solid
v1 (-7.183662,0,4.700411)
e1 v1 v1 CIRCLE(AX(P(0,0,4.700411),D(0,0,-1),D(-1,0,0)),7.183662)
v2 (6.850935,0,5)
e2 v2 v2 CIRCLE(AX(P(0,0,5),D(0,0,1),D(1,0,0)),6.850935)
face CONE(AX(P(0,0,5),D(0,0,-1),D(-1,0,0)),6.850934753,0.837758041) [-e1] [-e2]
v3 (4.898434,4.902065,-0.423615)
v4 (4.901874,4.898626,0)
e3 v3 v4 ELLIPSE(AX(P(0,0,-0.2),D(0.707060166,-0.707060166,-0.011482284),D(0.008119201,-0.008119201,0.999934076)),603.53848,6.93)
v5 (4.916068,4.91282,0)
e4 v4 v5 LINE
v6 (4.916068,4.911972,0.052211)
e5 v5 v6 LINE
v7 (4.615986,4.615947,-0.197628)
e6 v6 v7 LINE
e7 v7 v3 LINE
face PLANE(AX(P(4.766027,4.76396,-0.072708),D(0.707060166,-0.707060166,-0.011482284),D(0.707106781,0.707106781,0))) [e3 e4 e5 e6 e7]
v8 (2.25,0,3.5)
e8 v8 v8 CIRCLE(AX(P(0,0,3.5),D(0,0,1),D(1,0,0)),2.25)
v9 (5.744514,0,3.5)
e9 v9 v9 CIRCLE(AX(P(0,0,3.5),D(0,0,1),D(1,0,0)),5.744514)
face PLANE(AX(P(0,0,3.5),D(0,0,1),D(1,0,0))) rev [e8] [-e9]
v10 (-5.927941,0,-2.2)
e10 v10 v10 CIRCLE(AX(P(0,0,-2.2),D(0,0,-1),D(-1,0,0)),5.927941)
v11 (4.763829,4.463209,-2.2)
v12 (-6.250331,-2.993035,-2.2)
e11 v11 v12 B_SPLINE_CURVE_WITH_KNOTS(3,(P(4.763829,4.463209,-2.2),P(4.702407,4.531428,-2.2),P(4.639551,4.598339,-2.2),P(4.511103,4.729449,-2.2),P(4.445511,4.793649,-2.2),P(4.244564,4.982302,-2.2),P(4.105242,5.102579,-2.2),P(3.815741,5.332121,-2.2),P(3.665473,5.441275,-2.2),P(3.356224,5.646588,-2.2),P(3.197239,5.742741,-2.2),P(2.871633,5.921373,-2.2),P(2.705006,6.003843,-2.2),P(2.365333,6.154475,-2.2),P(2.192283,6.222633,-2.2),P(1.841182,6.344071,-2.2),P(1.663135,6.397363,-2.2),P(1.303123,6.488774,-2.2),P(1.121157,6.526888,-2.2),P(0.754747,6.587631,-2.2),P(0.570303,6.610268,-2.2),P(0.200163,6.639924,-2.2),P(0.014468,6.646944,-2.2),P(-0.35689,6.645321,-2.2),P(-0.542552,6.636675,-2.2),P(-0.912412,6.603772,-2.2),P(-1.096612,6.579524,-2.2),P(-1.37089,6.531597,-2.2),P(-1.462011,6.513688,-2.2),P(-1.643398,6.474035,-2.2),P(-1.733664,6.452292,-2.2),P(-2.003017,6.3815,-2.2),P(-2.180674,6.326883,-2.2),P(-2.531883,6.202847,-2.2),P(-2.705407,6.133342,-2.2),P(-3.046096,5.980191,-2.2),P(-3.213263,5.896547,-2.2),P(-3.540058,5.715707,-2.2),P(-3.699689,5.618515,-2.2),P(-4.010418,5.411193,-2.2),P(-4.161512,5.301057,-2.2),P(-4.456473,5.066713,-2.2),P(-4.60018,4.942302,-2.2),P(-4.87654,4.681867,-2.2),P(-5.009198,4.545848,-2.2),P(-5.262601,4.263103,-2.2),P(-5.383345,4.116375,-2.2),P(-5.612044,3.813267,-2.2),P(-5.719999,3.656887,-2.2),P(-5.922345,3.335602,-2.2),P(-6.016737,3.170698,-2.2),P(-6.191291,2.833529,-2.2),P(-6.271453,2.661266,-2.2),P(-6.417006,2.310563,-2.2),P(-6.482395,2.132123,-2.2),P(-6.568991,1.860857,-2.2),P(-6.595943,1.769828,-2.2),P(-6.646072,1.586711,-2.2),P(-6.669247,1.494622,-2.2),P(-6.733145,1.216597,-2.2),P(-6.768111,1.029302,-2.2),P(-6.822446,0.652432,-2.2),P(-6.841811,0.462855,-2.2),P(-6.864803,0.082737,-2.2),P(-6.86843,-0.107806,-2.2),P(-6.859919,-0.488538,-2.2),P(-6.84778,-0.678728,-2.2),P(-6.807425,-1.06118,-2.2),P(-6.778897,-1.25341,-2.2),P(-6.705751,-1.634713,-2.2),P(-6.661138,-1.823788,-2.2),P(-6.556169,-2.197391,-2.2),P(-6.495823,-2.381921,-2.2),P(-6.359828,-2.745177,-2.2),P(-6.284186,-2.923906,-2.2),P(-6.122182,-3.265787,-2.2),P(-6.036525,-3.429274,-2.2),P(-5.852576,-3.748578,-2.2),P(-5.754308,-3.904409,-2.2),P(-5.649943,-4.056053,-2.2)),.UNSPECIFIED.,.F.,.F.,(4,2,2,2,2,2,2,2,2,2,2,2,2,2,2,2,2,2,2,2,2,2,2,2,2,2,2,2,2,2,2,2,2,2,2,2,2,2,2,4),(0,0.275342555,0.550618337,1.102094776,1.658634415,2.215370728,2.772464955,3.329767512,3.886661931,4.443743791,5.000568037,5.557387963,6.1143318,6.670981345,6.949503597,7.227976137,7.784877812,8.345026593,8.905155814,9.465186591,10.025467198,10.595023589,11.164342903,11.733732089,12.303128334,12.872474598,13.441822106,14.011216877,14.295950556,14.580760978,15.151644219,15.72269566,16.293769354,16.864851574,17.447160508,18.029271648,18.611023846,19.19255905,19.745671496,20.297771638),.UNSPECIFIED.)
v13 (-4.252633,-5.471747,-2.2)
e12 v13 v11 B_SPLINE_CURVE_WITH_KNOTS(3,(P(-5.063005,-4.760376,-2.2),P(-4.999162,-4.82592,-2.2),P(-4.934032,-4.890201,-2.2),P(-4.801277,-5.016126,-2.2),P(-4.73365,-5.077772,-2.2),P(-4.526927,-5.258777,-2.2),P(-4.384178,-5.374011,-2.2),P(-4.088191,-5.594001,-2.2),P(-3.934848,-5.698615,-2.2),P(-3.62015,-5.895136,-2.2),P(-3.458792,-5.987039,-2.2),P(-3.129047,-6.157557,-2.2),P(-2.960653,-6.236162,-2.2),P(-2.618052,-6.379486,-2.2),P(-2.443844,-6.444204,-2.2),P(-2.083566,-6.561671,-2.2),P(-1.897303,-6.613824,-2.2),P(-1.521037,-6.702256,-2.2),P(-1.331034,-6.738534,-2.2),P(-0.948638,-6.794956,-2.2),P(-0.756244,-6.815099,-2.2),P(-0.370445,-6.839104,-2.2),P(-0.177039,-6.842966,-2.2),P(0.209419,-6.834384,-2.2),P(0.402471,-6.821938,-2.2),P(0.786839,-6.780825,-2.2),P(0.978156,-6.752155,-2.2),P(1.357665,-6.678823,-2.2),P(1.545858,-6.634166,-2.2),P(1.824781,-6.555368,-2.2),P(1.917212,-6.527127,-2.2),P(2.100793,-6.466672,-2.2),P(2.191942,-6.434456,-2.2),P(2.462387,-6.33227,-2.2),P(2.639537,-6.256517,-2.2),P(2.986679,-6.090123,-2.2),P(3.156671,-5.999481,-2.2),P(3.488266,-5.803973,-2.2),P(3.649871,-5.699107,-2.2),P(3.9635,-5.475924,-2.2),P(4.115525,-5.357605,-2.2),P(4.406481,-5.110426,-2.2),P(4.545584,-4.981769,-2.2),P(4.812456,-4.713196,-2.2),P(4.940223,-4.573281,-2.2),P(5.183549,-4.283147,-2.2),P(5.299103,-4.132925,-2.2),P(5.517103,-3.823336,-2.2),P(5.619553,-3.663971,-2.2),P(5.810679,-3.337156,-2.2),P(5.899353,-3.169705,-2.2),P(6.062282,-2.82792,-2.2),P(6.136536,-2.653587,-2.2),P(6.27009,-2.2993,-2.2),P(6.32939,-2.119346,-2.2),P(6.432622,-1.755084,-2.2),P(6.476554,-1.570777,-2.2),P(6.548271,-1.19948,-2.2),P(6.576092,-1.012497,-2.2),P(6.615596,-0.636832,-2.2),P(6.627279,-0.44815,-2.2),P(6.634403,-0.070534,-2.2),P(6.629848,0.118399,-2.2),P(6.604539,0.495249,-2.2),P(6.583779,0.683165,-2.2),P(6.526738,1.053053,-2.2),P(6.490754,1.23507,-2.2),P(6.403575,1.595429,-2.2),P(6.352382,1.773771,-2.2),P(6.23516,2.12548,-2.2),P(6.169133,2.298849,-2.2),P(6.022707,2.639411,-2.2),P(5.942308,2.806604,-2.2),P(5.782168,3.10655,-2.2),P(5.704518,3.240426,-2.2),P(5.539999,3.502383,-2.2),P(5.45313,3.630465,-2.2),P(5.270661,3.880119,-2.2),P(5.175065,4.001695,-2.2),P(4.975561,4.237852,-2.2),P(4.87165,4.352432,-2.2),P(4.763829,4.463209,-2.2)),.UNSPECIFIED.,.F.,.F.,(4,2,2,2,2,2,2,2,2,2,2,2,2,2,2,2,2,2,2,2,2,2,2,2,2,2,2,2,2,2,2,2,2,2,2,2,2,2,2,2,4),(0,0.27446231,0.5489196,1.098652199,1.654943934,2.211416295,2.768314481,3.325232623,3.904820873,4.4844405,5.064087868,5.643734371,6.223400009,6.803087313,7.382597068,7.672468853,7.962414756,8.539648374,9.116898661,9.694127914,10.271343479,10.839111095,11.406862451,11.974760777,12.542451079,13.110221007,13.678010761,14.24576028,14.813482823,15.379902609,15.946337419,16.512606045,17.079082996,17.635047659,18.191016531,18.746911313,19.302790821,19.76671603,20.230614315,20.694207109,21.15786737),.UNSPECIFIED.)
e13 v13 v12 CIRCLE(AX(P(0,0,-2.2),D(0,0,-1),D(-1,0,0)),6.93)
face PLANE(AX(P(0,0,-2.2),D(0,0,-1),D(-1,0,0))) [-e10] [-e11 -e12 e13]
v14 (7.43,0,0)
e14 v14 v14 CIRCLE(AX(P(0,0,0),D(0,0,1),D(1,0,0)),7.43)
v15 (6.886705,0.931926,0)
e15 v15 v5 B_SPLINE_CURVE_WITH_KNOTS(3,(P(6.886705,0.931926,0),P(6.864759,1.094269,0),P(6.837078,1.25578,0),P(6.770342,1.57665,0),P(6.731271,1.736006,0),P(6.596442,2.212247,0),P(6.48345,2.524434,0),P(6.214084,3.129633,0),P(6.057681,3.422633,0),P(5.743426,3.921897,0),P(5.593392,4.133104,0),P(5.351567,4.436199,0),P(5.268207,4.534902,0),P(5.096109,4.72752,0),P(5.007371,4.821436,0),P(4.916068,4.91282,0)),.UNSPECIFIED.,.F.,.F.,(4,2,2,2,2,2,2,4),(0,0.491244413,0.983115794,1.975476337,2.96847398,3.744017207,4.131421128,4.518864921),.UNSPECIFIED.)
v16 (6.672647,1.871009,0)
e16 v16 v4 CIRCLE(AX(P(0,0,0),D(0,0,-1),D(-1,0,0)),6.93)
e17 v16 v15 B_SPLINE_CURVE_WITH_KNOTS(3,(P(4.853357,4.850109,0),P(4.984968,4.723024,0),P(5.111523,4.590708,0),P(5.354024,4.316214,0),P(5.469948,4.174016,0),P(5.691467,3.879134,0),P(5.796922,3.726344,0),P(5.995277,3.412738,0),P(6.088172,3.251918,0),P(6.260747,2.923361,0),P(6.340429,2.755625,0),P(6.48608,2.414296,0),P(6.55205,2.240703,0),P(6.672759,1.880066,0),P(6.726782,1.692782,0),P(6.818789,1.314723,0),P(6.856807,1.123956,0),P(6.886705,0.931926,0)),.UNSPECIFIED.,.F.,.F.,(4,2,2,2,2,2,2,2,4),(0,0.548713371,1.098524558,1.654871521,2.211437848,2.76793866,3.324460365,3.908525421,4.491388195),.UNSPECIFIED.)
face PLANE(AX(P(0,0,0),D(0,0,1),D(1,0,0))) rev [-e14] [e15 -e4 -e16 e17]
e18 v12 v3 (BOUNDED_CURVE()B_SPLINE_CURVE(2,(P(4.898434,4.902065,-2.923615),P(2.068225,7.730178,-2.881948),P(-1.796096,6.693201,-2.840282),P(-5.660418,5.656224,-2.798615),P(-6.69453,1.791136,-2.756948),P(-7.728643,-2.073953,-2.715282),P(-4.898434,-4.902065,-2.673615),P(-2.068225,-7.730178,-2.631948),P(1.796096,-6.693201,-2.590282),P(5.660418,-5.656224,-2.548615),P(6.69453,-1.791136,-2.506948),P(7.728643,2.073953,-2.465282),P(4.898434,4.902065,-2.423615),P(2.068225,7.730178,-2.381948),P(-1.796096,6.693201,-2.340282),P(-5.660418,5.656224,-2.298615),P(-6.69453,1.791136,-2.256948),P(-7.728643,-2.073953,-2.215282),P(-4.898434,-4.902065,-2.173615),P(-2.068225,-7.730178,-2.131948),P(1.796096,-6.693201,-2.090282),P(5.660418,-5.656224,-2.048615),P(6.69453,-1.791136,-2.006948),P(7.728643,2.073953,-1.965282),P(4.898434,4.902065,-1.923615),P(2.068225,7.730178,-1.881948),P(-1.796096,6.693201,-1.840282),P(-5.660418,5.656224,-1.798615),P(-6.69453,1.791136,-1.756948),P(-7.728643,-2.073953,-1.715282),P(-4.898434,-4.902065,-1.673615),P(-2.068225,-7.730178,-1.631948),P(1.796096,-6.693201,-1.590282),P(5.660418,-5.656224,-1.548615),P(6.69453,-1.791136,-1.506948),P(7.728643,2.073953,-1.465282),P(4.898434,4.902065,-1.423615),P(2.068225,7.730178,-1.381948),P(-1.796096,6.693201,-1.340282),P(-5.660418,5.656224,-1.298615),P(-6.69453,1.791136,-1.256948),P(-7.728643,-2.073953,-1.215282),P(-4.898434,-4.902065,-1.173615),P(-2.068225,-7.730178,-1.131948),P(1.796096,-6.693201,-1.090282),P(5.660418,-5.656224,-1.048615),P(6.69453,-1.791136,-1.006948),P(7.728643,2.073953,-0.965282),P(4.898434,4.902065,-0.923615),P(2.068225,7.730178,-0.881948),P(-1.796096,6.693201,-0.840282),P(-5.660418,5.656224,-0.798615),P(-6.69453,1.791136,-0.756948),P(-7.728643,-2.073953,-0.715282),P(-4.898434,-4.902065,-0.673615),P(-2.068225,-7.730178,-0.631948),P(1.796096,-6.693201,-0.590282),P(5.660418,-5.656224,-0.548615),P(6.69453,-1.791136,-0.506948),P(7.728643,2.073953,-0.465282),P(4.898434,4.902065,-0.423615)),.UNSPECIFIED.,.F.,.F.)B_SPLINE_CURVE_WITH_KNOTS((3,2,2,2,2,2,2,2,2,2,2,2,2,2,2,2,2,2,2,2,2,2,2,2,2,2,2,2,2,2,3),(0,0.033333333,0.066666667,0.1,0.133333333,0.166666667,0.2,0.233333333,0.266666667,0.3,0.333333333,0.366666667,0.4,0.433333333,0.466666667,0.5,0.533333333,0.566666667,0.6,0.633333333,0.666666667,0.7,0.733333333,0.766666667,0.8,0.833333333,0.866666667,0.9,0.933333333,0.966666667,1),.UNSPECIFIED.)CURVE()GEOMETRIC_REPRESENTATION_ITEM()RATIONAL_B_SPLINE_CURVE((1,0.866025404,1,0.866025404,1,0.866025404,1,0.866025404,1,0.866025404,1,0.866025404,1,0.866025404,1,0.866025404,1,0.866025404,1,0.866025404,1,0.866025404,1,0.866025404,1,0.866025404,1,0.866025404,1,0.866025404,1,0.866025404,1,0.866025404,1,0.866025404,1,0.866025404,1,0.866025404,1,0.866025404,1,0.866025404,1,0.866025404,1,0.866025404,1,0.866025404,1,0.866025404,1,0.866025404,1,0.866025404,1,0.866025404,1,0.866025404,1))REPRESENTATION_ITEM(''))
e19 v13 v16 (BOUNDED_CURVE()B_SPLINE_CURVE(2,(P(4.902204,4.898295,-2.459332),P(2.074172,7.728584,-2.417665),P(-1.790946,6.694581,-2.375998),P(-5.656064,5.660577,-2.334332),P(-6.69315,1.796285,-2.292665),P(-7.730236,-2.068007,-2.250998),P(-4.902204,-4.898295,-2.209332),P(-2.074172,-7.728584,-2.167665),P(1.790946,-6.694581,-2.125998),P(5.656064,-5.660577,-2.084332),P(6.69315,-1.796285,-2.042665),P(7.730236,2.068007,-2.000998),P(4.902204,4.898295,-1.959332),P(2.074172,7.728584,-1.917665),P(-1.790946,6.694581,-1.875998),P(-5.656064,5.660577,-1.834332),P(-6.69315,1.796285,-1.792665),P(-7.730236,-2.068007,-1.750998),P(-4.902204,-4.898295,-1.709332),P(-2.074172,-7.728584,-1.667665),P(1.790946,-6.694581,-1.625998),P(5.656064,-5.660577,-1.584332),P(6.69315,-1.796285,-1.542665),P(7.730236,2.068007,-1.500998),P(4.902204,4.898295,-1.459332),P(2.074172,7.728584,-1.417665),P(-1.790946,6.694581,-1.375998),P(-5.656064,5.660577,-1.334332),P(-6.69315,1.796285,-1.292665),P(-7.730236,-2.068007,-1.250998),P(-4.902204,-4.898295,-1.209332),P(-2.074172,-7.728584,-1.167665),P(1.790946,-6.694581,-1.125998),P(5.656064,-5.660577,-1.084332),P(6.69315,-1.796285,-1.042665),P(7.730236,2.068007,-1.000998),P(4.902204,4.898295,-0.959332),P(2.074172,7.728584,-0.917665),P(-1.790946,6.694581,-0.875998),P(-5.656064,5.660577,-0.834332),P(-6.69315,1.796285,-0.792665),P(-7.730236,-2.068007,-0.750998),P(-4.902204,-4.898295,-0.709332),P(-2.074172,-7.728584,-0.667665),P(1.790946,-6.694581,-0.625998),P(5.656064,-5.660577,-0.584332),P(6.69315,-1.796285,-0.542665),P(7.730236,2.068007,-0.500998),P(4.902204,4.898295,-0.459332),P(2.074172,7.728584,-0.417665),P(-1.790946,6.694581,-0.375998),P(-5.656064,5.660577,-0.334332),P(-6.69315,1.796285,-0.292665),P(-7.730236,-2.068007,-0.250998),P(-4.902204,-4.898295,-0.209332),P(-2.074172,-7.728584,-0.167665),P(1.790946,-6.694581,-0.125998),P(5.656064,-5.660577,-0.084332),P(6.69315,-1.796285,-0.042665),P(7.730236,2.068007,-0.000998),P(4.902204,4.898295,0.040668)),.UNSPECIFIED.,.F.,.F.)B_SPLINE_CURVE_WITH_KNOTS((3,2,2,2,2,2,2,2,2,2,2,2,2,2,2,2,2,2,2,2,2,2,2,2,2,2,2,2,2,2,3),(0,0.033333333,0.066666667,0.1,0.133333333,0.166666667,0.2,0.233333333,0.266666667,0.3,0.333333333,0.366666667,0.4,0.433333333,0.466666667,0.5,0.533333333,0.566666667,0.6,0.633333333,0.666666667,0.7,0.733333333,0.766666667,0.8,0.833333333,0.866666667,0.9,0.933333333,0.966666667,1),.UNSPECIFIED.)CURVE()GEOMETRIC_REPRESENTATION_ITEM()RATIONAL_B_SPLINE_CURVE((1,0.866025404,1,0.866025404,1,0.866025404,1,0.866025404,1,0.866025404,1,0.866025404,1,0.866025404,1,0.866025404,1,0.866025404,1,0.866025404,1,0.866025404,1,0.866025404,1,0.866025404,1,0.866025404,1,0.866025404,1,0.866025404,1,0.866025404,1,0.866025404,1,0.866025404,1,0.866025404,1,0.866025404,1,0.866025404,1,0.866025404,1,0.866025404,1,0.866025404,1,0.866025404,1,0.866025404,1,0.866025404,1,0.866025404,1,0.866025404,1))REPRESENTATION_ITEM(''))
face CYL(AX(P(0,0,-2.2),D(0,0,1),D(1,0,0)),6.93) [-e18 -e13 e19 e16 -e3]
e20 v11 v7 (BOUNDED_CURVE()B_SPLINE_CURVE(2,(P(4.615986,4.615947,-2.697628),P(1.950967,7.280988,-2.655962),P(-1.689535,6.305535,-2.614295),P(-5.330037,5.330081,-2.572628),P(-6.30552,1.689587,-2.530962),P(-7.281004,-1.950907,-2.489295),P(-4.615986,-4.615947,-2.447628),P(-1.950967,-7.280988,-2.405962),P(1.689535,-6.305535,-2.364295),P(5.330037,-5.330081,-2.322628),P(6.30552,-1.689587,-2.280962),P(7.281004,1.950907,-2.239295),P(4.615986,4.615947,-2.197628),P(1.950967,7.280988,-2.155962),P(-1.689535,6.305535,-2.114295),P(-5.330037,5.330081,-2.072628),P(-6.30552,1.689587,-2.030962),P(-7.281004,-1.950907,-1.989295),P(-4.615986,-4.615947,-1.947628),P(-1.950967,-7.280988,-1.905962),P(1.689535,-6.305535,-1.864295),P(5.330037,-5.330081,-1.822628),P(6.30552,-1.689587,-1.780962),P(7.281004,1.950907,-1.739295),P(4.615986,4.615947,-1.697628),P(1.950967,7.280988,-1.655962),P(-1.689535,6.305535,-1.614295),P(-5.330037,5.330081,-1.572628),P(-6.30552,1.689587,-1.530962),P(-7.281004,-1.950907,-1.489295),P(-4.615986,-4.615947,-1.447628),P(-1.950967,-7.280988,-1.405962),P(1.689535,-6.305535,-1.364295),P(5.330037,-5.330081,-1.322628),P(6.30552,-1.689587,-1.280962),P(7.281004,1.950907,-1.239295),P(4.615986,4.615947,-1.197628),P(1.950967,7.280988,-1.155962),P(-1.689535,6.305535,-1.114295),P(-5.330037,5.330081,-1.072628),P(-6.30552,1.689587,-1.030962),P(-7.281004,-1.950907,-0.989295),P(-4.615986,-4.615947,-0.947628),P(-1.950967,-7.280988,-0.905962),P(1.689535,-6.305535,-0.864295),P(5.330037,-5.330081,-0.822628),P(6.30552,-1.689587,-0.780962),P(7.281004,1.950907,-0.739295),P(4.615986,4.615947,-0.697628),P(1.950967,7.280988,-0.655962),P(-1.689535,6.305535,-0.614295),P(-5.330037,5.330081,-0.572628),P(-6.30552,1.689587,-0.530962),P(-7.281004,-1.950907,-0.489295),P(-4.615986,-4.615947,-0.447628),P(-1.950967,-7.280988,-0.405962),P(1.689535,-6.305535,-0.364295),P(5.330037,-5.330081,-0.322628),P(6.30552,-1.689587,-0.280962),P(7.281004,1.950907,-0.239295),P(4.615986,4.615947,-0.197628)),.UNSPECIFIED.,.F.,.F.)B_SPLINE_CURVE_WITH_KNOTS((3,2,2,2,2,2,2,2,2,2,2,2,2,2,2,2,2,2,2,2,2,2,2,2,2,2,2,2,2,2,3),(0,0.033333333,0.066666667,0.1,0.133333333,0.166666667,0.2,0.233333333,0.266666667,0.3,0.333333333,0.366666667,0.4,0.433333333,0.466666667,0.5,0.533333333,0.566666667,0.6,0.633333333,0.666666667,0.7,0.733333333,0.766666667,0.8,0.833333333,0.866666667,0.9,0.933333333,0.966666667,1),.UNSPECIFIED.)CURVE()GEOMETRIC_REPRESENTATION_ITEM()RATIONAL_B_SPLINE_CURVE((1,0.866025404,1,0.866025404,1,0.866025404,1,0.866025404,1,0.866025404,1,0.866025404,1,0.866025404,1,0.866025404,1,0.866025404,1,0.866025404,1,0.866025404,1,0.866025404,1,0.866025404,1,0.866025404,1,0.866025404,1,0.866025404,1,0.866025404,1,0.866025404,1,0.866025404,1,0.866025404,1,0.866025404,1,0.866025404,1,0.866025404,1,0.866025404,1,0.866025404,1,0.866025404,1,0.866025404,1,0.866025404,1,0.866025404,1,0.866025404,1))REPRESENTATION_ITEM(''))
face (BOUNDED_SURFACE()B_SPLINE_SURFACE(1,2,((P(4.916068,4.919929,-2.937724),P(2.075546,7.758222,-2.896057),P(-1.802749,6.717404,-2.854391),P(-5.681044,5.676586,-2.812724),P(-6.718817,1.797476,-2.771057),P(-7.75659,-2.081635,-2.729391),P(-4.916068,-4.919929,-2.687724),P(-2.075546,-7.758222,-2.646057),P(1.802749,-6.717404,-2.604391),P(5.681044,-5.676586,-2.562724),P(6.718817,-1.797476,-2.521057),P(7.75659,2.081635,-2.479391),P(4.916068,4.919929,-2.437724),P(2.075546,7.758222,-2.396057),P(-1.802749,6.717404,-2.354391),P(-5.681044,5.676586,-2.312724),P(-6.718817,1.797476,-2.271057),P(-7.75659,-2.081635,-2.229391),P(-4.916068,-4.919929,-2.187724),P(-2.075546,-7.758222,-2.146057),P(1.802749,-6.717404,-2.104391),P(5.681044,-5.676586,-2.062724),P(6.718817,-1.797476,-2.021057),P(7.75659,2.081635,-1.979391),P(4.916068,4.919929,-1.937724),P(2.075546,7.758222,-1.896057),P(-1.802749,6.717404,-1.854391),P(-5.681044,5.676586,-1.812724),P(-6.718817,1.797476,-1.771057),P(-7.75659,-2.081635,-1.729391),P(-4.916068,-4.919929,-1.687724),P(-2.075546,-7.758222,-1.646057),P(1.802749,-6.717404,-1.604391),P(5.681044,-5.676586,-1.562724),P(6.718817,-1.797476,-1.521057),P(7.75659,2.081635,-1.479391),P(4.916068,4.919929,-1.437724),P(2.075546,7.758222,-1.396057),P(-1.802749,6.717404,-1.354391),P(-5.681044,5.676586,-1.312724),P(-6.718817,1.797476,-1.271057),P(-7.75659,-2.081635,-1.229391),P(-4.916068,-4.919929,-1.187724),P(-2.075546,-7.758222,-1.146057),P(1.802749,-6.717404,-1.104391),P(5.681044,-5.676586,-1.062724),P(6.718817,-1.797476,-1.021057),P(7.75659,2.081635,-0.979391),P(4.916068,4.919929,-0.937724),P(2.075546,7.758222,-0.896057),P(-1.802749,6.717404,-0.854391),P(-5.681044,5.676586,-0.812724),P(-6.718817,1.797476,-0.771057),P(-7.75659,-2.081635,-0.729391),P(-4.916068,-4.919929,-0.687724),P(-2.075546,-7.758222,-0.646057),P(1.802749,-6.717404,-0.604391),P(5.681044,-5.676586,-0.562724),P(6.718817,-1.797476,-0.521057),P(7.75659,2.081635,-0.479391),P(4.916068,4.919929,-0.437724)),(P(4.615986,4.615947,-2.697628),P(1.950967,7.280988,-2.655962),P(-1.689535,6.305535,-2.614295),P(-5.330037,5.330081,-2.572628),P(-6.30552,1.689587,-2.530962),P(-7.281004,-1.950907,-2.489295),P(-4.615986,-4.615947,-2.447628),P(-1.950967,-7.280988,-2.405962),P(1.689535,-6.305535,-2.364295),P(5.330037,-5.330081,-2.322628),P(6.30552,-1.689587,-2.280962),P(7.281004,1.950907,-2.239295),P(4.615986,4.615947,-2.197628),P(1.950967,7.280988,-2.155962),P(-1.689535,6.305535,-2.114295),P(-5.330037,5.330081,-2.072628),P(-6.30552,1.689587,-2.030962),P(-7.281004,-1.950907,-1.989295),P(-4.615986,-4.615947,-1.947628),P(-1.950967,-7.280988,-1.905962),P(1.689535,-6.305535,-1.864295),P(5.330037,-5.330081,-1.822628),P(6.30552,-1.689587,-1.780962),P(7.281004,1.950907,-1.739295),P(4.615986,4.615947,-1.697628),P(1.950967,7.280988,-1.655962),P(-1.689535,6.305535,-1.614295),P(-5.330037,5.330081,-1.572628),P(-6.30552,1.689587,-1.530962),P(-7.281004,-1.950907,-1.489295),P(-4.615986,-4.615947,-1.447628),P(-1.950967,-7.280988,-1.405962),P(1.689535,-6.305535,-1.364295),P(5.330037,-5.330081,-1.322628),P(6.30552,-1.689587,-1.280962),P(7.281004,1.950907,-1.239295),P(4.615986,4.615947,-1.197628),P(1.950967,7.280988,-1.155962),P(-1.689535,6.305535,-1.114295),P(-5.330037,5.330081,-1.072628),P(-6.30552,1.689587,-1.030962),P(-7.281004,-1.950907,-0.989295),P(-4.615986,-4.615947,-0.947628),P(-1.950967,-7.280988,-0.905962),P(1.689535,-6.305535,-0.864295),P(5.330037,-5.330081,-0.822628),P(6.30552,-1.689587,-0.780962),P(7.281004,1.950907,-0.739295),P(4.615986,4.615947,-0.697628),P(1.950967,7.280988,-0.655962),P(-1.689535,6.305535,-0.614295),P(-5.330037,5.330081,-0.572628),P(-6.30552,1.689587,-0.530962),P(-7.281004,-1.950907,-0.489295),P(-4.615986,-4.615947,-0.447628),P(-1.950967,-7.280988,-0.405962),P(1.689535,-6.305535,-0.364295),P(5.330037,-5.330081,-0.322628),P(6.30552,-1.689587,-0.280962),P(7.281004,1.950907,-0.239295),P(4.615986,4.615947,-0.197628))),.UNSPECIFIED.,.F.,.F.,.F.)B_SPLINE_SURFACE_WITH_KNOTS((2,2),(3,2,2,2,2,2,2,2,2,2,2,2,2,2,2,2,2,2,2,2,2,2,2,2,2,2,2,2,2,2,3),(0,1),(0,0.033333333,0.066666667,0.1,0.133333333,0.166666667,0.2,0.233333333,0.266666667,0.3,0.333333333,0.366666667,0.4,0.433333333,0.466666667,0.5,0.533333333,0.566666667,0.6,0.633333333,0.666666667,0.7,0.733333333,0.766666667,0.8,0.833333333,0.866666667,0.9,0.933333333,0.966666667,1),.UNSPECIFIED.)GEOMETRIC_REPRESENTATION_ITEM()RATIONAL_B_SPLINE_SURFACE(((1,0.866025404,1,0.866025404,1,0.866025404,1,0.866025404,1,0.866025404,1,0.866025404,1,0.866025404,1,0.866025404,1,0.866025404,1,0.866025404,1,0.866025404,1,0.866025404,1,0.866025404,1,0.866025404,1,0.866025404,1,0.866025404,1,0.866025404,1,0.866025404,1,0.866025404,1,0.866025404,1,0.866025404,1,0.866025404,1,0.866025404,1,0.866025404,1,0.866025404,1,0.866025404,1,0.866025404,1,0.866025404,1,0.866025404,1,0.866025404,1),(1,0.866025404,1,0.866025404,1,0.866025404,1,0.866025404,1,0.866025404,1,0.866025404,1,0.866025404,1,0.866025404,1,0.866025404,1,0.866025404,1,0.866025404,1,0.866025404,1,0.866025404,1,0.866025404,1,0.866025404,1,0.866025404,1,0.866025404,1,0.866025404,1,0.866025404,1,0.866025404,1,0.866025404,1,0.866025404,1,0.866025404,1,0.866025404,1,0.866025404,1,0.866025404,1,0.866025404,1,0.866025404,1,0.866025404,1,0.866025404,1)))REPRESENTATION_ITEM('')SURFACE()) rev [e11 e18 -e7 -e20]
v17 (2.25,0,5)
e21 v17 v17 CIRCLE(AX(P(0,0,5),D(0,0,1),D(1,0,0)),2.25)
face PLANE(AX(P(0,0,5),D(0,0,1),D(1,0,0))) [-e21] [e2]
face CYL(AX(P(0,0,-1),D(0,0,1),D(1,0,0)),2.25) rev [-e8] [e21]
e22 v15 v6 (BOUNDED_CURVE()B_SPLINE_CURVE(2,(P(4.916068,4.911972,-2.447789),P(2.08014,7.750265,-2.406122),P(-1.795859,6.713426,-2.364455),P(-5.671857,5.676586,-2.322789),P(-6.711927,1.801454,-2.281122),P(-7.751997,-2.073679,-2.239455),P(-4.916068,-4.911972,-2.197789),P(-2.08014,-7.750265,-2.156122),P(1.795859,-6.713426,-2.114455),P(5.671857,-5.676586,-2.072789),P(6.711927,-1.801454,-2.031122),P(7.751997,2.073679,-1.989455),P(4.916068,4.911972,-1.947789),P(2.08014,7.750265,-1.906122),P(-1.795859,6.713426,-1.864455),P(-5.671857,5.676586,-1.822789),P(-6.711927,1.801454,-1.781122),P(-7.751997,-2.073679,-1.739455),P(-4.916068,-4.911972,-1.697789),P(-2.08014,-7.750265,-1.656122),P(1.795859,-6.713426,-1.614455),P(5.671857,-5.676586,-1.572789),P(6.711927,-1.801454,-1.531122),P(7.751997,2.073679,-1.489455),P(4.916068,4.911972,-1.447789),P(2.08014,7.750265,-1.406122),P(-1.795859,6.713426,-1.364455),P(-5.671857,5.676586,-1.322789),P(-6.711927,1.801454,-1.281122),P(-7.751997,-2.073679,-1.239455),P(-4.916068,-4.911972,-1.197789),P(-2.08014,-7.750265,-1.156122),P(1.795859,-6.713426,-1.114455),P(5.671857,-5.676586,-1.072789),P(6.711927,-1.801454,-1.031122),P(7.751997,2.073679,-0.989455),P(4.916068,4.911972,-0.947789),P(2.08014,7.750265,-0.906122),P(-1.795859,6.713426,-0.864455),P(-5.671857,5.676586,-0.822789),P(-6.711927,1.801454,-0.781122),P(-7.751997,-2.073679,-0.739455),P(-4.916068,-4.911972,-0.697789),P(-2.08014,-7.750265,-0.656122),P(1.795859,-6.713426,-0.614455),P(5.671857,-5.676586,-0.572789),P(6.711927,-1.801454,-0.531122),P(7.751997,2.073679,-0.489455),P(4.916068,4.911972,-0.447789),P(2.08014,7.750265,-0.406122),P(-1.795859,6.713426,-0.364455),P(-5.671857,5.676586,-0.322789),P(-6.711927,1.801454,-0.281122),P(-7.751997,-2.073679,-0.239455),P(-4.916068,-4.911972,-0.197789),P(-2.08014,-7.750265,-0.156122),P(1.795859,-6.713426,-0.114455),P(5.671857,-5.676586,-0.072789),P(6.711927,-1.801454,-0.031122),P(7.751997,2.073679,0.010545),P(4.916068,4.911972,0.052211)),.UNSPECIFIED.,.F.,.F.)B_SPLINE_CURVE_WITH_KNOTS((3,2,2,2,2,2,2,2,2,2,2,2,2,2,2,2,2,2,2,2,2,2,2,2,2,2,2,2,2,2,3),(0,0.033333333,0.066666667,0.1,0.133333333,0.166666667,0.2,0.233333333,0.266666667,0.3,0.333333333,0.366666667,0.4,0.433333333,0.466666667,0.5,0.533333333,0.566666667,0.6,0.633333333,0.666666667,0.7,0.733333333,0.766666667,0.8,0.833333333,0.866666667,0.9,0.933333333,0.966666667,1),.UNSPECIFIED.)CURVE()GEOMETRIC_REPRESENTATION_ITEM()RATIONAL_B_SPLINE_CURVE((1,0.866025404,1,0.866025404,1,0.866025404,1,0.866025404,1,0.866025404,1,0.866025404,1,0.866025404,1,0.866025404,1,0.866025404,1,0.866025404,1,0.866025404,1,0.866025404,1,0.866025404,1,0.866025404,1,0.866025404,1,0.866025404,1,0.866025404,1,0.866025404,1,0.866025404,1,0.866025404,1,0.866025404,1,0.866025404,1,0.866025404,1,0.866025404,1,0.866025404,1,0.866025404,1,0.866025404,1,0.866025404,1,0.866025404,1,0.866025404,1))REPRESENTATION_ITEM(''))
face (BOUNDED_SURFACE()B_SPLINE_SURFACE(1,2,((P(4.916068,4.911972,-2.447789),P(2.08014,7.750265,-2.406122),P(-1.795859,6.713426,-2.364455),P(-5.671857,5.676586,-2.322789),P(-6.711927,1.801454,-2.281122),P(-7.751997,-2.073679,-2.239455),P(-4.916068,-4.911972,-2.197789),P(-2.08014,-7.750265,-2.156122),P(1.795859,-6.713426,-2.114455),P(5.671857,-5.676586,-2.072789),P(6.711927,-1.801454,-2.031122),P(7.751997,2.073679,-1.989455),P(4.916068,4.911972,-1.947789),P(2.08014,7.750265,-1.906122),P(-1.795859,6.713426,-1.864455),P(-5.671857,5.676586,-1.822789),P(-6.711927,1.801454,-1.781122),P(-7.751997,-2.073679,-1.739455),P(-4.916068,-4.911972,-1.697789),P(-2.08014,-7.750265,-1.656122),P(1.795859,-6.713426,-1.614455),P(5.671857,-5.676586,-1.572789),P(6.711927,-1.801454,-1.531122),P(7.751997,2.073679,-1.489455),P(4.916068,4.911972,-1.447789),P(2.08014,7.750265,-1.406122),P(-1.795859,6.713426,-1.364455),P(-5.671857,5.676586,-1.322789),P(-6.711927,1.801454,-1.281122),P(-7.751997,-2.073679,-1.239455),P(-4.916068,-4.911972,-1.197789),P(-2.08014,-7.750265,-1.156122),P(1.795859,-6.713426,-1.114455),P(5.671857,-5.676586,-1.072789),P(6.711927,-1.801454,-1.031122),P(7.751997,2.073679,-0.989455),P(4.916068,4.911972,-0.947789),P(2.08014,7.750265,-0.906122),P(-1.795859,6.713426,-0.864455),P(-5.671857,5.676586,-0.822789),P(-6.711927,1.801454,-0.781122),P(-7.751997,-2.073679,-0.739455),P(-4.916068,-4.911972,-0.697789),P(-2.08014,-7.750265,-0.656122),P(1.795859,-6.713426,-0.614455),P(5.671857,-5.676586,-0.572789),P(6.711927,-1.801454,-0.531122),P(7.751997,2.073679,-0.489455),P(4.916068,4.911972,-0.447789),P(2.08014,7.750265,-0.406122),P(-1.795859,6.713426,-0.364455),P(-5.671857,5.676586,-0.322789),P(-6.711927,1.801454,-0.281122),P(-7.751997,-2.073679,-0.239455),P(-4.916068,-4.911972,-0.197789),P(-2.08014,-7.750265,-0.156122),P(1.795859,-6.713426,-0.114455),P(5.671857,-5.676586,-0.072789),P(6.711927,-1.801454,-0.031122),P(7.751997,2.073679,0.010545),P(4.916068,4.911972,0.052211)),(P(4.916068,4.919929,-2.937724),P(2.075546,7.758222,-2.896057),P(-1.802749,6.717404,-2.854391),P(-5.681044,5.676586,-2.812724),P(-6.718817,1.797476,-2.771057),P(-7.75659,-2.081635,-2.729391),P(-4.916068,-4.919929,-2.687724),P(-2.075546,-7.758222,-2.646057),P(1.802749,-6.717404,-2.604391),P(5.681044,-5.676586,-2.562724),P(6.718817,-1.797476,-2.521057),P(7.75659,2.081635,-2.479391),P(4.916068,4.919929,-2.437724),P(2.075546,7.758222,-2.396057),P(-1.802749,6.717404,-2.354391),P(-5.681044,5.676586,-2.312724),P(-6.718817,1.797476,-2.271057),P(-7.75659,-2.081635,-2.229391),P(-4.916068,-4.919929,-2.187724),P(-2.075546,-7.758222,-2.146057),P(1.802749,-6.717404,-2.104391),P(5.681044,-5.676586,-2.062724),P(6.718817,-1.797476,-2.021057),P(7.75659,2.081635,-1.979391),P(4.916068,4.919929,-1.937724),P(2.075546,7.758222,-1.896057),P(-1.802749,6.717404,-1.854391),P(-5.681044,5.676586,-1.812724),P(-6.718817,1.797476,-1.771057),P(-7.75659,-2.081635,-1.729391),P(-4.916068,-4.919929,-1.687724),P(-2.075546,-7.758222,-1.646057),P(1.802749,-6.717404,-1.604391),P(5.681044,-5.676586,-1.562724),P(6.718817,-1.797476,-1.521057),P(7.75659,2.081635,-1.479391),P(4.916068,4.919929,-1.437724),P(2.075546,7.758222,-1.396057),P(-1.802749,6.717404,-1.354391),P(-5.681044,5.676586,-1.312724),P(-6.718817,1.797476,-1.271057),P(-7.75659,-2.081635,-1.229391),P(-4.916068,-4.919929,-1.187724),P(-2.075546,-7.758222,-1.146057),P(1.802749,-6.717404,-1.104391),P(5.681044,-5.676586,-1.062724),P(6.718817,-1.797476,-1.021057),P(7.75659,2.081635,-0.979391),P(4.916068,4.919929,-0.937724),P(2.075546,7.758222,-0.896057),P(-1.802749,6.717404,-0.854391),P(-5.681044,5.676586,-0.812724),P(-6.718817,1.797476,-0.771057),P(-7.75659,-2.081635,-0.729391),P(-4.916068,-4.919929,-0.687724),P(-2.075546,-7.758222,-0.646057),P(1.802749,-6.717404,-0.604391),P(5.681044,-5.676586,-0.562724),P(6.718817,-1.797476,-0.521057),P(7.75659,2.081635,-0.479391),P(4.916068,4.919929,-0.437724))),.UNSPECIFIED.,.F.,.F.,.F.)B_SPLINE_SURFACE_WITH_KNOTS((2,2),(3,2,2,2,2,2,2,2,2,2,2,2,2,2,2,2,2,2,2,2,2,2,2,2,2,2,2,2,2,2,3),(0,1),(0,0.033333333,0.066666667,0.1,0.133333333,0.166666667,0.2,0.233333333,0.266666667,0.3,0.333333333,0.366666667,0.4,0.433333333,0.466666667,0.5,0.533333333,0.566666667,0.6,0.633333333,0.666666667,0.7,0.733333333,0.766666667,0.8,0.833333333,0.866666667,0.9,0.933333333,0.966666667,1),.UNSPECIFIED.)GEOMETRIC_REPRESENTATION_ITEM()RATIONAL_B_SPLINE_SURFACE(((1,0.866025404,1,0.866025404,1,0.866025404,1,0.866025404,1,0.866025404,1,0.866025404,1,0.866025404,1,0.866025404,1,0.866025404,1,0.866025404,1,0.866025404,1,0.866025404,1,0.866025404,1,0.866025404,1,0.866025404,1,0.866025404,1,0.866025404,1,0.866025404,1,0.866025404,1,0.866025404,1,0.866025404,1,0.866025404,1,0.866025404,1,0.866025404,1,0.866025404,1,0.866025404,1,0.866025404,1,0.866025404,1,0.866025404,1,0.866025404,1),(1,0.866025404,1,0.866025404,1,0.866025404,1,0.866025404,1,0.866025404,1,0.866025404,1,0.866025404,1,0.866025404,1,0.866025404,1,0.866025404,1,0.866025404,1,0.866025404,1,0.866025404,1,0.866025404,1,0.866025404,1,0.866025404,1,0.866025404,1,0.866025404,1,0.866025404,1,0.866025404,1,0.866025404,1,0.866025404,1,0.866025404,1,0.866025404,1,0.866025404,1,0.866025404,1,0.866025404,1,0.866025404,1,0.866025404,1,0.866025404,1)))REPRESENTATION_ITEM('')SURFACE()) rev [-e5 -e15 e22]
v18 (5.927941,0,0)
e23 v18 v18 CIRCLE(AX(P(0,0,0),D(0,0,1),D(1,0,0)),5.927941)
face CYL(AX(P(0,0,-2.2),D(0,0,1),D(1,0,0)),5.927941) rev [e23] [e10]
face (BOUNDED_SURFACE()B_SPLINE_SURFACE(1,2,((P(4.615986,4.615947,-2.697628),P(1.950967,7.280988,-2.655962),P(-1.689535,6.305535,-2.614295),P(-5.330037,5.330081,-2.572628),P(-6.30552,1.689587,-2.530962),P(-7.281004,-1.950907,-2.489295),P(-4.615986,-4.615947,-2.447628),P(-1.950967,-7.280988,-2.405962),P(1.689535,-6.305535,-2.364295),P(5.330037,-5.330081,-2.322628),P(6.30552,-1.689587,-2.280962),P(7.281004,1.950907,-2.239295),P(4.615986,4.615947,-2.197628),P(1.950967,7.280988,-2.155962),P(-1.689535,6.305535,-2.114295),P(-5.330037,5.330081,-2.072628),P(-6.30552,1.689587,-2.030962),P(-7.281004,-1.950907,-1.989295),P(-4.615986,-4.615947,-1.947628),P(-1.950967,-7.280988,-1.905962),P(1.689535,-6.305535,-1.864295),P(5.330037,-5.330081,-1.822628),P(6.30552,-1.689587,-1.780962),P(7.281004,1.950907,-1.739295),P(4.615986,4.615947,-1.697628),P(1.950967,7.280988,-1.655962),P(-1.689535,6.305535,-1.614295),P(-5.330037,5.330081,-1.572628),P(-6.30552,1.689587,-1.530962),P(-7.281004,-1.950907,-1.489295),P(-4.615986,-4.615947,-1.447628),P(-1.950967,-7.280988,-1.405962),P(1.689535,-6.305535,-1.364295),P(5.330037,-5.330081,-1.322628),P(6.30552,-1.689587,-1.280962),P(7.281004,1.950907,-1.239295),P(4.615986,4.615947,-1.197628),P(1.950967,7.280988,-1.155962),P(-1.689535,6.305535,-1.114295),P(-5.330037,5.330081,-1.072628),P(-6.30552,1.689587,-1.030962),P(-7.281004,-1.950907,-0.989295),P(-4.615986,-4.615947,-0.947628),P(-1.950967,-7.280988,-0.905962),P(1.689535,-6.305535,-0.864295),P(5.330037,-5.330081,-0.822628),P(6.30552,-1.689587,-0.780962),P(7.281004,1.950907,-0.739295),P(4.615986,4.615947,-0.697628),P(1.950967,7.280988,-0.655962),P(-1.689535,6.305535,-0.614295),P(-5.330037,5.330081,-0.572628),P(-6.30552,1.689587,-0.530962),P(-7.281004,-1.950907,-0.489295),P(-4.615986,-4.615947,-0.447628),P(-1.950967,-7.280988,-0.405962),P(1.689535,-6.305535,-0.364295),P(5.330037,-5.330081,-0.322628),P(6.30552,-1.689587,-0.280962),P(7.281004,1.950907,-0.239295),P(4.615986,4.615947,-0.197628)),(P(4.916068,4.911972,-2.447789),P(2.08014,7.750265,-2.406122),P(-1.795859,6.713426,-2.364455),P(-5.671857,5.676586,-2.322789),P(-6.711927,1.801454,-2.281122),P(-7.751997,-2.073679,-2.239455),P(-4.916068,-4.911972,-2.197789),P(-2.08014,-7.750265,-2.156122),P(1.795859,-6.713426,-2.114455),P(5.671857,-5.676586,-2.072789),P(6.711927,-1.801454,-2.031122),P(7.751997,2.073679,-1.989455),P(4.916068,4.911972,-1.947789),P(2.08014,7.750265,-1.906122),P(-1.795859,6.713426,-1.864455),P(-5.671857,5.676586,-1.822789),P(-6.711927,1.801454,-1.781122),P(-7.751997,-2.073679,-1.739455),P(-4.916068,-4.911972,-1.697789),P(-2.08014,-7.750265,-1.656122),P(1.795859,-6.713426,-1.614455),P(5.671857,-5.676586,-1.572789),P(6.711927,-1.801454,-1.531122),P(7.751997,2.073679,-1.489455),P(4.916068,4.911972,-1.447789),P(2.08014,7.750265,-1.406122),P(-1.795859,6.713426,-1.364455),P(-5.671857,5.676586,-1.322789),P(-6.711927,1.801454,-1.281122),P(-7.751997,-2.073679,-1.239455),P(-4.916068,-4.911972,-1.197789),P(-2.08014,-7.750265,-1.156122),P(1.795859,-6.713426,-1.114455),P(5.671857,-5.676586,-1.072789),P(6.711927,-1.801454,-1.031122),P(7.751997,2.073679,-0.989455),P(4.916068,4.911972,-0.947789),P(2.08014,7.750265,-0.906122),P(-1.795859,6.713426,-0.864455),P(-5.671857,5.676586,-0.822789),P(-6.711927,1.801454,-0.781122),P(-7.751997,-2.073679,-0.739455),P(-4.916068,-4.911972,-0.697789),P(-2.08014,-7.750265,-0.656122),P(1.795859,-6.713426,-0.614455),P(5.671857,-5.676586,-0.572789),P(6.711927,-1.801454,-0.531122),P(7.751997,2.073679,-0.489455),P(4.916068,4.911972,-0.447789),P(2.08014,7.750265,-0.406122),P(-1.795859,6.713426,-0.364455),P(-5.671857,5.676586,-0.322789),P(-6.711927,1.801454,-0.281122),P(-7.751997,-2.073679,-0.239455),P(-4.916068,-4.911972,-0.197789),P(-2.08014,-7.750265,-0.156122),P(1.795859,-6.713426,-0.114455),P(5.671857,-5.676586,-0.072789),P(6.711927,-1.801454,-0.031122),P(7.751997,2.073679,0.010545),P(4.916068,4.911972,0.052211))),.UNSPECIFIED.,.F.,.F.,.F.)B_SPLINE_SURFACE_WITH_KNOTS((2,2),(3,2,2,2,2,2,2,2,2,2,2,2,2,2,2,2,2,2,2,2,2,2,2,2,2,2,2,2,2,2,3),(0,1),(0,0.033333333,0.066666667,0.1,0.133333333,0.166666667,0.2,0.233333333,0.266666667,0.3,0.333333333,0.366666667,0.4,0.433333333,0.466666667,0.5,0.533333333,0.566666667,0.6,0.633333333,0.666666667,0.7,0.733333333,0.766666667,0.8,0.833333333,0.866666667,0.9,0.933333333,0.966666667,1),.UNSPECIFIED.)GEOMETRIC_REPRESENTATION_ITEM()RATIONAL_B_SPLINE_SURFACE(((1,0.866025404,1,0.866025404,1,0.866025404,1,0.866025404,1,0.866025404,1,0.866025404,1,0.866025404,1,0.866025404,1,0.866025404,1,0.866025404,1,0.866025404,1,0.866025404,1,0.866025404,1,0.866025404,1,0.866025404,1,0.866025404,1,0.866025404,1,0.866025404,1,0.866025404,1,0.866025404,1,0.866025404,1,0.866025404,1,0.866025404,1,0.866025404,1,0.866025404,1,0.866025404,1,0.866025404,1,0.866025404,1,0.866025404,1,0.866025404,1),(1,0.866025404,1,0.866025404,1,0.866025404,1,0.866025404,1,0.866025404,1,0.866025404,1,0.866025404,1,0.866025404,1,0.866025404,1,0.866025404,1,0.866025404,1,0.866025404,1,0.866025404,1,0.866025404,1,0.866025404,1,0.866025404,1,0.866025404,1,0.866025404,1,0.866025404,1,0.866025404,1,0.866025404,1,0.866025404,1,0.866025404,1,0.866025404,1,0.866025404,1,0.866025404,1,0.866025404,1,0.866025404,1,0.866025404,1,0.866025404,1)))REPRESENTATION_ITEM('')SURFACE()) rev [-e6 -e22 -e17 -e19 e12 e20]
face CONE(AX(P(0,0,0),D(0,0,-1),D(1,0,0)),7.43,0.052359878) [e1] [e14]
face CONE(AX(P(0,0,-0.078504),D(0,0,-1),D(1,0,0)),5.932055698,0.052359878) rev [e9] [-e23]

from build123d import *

# Parameters (mm, degrees)
SKETCH1_R           = 7.43
BOSS_EXTRUDE3_DEPTH = 5
BOSS_EXTRUDE3_TAPER = 3
SHELL1_T            = -1.5
SKETCH3_R           = 6.93
SKETCH3_R_2         = 5.927941481
BOSS_EXTRUDE4_DEPTH = 2.2
CUT_SWEEP1_PITCH    = 0.5
CHAMFER1_SIZE       = 0.3
CHAMFER1_SIZE_2     = 0.317026351
SKETCH7_R           = 2.25
CUT_EXTRUDE1_DEPTH  = 6


with BuildPart() as part:
    # Sketch1 → Boss-Extrude3 (new body)
    with BuildSketch(Plane.XY):
        Circle(SKETCH1_R)
    extrude(amount=BOSS_EXTRUDE3_DEPTH, taper=BOSS_EXTRUDE3_TAPER)

    # Shell1
    shell1_openings = [part.faces().sort_by_distance(p)[0] for p in [
        (0, 0, 0),
    ]]
    offset(amount=SHELL1_T, openings=shell1_openings, kind=Kind.INTERSECTION)


with BuildPart() as body_2:
    # Sketch3 → Boss-Extrude4 (new body)
    with BuildSketch(Plane(origin=(0, 0, 0), x_dir=(-1, 0, 0), z_dir=(0, 0, -1))):
        Circle(SKETCH3_R)
        Circle(SKETCH3_R_2, mode=Mode.SUBTRACT)
    extrude(amount=BOSS_EXTRUDE4_DEPTH)


with BuildPart() as part_1:
    add(part.part)

    # Combine1: union body 2
    add(body_2.part)

    # Cut-Sweep1: arcs per turn and ends read off the stored shape
    # Cut-Sweep1: the profile of Sketch6 screwed along a right-hand helix through 5 turns, 6 arcs to a turn; built about Z, then put on its axis
    cut_sweep1_z = Axis((0, 0, 0), (0, 0, 1))
    cut_sweep1_corners = [(6.527962418, -2.7236e-05, -0.497628173), (6.94947392, -0.002896154, -0.24778858), (6.955099869, 0.002729794, -0.737723981)]
    with BuildLine(mode=Mode.PRIVATE) as cut_sweep1_profile:
        Line(cut_sweep1_corners[0], cut_sweep1_corners[1])
        Line(cut_sweep1_corners[1], cut_sweep1_corners[2])
        Line(cut_sweep1_corners[2], cut_sweep1_corners[0])
    cut_sweep1_cap = Face(cut_sweep1_profile.wire())
    cut_sweep1_turn_angles = [0, 30, 60, 90, 120, 150, 180, 210, 240, 270, 300, 330, 360]
    cut_sweep1_turn_weights = [1, 0.8660254037844387, 1, 0.8660254037844387, 1, 0.8660254037844387, 1, 0.8660254037844387, 1, 0.8660254037844387, 1, 0.8660254037844387, 1]
    cut_sweep1_turn_rails = [Edge.make_bspline([Vector(p[0], p[1], 0).rotate(cut_sweep1_z, cut_sweep1_turn_angles[k]) / cut_sweep1_turn_weights[k] + Vector(0, 0, p[2] + CUT_SWEEP1_PITCH * cut_sweep1_turn_angles[k] / 360) for k in range(13)], [0, 0, 0, 1, 1, 2, 2, 3, 3, 4, 4, 5, 5, 6, 6, 6], 2, cut_sweep1_turn_weights) for p in cut_sweep1_corners]
    cut_sweep1_turn_sides = [Face.make_surface_from_curves(cut_sweep1_turn_rails[p[0]], cut_sweep1_turn_rails[p[1]]) for p in [(0, 1), (1, 2), (2, 0)]]
    cut_sweep1 = Plane(origin=(0, 0, -2.2), x_dir=(0.7071067811865512, 0.7071067811865438, 0), z_dir=(0, 0, 1)) * Solid(Shell([*[p.moved(Location((0, 0, CUT_SWEEP1_PITCH * i))) for i in range(5) for p in cut_sweep1_turn_sides], cut_sweep1_cap, cut_sweep1_cap.rotate(cut_sweep1_z, 1800).moved(Location((0, 0, CUT_SWEEP1_PITCH * 1800 / 360)))]))
    add(cut_sweep1, mode=Mode.SUBTRACT)

    # Chamfer1
    # the kernel refuses this chamfer: 0.317026351, 0.3 mm, written as the material it takes off along each edge
    with BuildSketch(Plane(origin=(0, 0, 5), x_dir=(1, 0, 0), z_dir=(0, 1, 0))) as chamfer1_piece_1:
        Polygon((7.167961104 + CHAMFER1_SIZE * 0.0523359562429, CHAMFER1_SIZE * 0.998629534755), (7.167961104 - CHAMFER1_SIZE_2, 0), (7.167961104, 0), align=None)
    revolve(axis=Axis((0, 0, 5), (0, 0, -1)), mode=Mode.SUBTRACT)

    # Sketch7 → Cut-Extrude1 (cut)
    with BuildSketch(Plane.XY.offset(5)):
        Circle(SKETCH7_R)
    extrude(amount=-CUT_EXTRUDE1_DEPTH, mode=Mode.SUBTRACT)


solid = part_1.part
